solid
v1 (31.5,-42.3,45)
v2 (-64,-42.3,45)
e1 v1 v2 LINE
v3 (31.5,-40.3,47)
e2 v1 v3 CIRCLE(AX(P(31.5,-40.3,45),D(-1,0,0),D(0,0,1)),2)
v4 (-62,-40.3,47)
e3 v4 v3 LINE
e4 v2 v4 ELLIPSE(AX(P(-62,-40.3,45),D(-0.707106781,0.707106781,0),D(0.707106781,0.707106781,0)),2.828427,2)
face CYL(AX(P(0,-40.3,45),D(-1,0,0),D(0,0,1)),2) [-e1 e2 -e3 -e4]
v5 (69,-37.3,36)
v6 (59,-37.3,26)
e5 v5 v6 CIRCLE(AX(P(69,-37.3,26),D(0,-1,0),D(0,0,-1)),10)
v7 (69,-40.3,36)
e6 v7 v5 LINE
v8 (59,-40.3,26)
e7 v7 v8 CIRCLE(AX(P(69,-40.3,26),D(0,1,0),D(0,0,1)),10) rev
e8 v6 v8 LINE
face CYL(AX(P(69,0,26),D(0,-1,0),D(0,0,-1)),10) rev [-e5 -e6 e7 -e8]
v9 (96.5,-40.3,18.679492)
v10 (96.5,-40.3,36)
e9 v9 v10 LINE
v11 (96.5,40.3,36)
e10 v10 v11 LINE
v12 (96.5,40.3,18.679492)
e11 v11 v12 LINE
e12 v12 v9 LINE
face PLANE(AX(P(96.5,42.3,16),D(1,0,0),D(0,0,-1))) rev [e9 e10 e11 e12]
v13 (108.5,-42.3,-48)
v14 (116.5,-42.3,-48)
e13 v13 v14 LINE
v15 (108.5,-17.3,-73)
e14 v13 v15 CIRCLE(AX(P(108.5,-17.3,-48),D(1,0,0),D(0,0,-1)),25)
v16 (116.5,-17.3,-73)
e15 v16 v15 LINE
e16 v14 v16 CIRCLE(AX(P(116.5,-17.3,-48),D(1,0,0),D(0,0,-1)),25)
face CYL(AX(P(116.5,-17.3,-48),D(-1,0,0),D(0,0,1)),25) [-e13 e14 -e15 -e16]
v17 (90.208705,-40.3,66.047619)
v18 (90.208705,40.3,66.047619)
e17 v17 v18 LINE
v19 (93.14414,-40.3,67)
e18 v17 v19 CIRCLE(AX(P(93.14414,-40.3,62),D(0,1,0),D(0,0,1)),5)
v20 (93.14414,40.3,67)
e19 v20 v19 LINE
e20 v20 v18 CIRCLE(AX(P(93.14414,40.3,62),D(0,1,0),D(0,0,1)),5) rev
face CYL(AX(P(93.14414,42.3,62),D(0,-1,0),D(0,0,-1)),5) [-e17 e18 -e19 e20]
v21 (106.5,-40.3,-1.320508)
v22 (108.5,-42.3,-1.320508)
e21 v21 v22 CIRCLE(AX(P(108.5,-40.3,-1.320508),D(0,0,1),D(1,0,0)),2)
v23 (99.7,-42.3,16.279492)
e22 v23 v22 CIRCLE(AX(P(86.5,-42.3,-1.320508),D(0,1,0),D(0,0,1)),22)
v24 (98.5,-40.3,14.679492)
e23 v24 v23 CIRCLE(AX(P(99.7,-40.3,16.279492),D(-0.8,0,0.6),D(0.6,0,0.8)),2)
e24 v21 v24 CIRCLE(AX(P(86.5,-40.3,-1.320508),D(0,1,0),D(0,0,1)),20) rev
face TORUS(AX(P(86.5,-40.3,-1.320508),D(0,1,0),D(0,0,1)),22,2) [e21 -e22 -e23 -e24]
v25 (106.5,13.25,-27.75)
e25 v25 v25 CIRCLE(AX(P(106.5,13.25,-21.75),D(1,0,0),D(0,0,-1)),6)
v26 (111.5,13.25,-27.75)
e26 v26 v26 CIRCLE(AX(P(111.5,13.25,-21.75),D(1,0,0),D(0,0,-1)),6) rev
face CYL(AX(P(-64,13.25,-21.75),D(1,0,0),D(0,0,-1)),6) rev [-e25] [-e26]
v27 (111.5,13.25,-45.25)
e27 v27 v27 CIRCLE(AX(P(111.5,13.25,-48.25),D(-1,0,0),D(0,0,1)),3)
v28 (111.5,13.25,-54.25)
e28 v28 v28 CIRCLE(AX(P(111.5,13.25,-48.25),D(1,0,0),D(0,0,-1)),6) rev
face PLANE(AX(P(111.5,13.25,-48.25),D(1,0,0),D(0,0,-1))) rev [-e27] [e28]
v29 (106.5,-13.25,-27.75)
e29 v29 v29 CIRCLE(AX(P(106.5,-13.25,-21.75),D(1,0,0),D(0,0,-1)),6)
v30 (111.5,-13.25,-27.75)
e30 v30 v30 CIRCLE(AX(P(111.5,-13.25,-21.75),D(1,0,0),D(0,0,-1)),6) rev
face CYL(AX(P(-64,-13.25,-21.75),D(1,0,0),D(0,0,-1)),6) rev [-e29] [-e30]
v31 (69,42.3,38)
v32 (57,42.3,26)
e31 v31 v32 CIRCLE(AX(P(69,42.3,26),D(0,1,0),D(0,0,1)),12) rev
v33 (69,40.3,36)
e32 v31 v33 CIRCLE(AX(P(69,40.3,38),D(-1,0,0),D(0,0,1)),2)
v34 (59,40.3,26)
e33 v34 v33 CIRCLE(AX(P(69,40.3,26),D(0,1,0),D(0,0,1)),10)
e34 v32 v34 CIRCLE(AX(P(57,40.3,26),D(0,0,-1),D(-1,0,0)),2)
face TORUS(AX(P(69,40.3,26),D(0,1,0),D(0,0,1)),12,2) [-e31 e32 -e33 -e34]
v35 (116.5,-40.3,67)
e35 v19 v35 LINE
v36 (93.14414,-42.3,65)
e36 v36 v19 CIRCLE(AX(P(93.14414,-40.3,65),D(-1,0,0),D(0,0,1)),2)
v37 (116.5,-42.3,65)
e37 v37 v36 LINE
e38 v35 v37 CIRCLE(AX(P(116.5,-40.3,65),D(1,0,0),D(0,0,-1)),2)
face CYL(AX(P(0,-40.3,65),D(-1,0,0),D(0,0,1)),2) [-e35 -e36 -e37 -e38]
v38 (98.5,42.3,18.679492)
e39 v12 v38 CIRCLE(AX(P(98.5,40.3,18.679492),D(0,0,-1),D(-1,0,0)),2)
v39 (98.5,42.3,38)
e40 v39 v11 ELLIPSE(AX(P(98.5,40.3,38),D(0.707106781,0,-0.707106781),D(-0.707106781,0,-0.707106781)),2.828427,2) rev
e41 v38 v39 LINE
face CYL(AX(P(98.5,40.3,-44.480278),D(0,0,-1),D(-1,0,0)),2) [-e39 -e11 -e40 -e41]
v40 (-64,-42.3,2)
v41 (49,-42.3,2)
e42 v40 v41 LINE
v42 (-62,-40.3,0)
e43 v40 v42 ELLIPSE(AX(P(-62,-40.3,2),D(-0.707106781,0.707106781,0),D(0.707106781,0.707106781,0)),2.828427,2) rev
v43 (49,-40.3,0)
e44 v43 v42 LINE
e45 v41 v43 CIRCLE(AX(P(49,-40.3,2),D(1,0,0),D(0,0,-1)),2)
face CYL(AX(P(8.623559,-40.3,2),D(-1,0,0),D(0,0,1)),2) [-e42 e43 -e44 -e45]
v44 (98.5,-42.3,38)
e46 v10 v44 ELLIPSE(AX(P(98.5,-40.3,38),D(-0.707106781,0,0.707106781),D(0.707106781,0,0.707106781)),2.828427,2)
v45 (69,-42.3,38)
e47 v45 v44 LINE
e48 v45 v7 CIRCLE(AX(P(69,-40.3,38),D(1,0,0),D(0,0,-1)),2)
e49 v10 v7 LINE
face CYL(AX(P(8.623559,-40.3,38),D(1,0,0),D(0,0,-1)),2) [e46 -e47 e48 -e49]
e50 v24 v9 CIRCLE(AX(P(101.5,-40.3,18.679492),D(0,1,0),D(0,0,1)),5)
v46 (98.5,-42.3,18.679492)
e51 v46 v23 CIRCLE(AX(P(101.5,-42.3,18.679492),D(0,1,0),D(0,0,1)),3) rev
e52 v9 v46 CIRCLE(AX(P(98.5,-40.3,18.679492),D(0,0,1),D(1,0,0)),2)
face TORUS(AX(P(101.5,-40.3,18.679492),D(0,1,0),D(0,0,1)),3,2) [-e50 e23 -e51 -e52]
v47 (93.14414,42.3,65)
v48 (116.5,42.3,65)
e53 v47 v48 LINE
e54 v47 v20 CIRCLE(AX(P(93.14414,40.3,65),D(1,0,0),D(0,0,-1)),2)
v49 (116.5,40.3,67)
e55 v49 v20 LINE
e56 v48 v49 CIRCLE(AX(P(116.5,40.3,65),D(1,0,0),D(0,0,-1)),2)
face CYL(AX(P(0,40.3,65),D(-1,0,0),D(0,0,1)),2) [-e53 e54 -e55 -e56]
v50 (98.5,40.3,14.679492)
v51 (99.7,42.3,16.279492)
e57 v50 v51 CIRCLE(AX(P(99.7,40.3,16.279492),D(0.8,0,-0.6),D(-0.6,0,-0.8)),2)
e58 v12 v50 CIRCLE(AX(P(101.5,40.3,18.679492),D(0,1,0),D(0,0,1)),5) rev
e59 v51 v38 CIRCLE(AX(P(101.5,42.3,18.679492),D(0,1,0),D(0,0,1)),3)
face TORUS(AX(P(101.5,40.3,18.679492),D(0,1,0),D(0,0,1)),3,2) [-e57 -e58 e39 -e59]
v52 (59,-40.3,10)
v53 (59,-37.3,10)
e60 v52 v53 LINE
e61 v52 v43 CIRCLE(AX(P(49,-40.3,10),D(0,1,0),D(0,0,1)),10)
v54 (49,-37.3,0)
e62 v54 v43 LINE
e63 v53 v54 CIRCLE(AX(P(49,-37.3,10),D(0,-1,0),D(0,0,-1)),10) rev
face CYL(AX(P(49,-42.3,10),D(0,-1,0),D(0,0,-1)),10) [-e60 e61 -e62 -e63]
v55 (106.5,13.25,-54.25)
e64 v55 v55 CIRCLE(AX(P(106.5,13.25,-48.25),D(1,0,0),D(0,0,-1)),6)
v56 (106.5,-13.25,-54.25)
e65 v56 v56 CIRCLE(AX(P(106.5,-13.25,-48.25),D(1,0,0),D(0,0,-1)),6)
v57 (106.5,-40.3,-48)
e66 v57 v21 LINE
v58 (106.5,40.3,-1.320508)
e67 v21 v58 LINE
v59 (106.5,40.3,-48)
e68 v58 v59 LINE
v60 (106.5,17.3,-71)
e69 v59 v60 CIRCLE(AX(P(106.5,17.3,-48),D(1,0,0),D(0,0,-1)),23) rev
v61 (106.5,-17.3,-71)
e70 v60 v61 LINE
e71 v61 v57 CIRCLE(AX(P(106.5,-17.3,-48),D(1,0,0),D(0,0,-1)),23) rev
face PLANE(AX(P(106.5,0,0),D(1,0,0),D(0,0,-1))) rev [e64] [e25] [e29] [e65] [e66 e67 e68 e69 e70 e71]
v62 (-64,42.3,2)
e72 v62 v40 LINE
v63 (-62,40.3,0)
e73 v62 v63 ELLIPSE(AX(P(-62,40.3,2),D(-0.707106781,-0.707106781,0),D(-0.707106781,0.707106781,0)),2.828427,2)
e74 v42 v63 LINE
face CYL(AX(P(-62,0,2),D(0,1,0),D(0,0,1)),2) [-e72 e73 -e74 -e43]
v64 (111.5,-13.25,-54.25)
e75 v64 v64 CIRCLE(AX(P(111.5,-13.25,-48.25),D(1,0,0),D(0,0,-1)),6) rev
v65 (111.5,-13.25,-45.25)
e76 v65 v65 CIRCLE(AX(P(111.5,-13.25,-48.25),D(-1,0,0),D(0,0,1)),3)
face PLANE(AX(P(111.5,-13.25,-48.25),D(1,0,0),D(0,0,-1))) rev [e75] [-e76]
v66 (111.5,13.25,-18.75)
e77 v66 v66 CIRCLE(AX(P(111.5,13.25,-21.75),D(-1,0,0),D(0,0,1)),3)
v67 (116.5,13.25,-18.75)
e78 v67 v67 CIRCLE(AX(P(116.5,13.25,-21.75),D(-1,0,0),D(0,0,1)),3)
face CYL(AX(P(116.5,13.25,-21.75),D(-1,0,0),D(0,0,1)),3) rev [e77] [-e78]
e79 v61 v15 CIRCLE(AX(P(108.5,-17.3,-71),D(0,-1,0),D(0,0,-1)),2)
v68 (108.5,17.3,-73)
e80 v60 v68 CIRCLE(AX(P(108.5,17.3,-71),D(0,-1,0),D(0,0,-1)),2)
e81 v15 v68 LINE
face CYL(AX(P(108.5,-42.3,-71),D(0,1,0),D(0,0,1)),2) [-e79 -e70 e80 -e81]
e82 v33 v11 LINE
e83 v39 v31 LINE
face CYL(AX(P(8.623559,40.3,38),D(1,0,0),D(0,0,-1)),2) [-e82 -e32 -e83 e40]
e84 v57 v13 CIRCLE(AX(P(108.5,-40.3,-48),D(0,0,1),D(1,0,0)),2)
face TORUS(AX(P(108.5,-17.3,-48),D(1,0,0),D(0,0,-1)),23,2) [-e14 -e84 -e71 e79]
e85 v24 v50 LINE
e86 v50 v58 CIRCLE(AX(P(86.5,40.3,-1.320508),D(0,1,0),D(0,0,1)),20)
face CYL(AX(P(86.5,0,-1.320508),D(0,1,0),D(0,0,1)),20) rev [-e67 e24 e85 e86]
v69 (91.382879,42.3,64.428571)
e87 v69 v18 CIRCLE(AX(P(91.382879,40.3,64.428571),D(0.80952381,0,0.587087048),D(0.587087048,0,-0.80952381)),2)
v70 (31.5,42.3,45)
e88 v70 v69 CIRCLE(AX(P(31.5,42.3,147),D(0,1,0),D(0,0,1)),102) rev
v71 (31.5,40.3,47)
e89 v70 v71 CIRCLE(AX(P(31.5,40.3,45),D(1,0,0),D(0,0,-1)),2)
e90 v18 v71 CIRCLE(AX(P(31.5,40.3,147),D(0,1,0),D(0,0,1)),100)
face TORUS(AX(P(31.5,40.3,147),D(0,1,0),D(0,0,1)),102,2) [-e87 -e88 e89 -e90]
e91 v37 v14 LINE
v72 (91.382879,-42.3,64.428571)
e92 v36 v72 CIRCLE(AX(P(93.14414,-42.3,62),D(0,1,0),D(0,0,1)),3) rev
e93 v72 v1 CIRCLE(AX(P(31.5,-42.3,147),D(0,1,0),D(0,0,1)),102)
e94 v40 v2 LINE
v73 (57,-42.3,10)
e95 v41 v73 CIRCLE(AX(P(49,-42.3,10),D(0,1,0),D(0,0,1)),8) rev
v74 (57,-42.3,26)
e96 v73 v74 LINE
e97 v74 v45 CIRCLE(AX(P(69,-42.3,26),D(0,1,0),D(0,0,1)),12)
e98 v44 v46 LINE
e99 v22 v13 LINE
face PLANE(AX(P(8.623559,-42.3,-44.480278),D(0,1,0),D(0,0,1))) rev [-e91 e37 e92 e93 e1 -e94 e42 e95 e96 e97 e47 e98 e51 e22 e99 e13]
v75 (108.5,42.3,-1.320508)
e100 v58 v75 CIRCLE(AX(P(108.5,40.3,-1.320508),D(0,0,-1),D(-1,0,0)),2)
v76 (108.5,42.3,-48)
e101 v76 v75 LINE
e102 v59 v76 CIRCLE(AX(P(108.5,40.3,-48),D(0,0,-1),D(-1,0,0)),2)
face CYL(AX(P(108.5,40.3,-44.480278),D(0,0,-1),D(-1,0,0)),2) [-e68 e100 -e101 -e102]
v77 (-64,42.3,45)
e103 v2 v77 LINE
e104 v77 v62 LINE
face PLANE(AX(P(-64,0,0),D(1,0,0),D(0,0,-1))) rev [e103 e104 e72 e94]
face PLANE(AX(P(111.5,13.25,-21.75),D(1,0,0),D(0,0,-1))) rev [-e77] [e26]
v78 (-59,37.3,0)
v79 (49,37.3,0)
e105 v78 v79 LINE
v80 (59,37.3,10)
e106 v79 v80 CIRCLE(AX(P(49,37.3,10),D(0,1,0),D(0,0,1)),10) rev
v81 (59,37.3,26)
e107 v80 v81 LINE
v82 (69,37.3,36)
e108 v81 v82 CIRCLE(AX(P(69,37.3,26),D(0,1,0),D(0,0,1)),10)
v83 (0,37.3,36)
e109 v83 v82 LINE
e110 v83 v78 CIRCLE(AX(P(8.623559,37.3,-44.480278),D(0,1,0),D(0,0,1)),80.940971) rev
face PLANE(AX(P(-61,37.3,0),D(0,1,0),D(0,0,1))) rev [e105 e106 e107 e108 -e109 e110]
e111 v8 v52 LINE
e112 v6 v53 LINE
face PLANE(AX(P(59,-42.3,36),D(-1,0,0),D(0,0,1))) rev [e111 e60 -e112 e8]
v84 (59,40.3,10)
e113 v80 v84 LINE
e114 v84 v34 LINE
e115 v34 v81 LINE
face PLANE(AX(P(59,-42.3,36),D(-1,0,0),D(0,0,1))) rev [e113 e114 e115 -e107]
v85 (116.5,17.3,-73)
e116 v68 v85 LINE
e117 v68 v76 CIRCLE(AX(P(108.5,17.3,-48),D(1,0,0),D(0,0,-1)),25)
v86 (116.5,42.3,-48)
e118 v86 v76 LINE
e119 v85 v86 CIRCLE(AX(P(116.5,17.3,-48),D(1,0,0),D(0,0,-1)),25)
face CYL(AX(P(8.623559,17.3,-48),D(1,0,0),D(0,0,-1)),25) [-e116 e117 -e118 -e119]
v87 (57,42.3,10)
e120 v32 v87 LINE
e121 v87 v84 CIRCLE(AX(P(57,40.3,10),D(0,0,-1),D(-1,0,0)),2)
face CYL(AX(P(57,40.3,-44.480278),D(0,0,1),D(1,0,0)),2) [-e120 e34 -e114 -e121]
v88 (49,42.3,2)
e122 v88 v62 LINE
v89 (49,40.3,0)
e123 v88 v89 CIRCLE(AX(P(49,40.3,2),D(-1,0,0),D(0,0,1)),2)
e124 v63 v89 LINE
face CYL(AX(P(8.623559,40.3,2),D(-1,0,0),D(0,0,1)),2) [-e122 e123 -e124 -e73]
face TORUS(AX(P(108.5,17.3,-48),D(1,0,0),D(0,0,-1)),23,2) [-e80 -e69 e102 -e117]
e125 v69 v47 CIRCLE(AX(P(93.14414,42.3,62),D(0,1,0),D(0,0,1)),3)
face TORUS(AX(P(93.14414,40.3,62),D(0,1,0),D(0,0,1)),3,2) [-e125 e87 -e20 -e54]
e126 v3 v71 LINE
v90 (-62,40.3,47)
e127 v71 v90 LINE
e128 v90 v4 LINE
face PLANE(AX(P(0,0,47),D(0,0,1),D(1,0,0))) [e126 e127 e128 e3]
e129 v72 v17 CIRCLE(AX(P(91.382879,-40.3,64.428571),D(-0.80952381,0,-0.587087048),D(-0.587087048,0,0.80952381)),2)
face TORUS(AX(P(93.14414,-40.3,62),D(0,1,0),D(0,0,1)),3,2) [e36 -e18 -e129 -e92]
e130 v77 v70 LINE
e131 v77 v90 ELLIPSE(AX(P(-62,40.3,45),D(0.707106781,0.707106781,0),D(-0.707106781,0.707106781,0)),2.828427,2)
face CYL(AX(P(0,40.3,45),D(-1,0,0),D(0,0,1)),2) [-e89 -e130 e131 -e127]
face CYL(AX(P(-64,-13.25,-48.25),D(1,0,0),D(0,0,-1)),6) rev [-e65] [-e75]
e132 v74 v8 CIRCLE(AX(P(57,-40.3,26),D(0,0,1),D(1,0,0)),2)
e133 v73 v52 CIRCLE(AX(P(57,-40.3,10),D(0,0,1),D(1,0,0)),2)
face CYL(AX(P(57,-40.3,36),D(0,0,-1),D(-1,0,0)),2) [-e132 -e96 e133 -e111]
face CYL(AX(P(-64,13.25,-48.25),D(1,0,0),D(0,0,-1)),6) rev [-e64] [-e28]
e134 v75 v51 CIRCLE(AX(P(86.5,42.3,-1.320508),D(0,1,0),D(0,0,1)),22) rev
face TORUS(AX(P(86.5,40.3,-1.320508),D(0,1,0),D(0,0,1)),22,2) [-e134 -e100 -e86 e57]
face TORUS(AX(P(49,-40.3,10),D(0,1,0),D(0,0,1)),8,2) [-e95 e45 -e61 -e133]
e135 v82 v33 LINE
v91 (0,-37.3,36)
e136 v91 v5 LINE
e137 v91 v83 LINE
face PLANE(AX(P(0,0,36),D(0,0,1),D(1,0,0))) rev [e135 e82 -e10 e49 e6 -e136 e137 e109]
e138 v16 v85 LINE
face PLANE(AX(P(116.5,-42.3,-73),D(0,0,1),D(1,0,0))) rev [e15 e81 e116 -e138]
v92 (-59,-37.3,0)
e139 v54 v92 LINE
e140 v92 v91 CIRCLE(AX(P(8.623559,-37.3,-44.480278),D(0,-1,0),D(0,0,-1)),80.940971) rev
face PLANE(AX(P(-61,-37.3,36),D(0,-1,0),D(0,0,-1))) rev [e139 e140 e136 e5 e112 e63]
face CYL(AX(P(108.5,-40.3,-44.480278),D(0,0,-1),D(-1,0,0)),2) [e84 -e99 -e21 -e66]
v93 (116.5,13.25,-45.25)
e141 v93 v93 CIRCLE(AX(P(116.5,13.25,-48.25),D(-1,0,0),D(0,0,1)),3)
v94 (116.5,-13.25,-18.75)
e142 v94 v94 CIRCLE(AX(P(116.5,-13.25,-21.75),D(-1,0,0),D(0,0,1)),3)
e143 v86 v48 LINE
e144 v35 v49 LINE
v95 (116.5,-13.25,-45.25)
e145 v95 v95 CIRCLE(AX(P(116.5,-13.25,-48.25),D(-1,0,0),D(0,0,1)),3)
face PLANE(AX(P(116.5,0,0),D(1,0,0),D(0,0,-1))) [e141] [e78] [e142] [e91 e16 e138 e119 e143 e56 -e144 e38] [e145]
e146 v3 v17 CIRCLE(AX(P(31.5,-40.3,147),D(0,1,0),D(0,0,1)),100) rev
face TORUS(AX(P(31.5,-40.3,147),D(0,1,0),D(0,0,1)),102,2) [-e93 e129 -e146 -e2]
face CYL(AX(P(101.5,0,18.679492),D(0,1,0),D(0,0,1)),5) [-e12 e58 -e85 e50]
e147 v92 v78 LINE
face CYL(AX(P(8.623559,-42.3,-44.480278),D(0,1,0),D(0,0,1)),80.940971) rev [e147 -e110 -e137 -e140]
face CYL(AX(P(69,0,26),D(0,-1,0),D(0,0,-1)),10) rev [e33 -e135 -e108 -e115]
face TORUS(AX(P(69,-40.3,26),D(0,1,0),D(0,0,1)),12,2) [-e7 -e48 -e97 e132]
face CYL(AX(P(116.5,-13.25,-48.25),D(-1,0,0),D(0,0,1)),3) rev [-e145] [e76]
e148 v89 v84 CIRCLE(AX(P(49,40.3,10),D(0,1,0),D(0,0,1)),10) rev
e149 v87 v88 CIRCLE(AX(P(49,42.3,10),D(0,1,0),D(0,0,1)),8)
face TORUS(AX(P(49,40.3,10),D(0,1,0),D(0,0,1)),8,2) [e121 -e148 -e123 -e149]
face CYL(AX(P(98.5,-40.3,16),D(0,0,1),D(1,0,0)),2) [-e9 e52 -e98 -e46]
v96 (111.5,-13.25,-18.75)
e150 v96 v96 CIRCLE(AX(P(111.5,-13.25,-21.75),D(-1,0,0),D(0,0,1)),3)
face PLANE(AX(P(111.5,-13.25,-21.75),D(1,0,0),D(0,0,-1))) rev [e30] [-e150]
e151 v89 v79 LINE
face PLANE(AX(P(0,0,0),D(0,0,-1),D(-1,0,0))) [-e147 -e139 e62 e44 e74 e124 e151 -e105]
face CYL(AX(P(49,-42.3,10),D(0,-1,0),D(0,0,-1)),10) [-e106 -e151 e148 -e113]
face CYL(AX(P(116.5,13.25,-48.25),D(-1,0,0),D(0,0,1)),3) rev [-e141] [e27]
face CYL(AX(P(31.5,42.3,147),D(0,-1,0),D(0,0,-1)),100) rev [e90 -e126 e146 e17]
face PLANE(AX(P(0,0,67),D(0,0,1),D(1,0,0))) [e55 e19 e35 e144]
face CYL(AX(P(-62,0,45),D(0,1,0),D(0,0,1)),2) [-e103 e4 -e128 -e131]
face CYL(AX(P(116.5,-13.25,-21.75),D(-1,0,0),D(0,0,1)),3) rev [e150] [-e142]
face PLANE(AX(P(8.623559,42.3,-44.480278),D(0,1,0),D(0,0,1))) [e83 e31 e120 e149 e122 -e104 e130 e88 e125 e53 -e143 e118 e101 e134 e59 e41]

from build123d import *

# Parameters (mm, degrees)
CROQUIS1_W               = 118
CROQUIS1_H               = 84.6
SALIENTE_EXTRUIR1_DEPTH  = 36
CROQUIS2_W               = 36
CROQUIS2_H               = 74.6
CORTAR_EXTRUIR1_DEPTH    = 120
CORTAR_EXTRUIR3_DEPTH    = 110.243581047
SALIENTE_EXTRUIR2_DEPTH  = 84.6
CROQUIS8_W               = 160.5
CROQUIS8_H               = 84.6
SALIENTE_EXTRUIR3_DEPTH  = 5
CROQUIS9_W               = 41
CROQUIS9_H               = 84.6
SALIENTE_EXTRUIR4_DEPTH  = 5
CROQUIS10_W              = 5
CROQUIS10_H              = 84.6
SALIENTE_EXTRUIR5_DEPTH  = 20
REDONDEO2_R              = 10
REDONDEO4_R              = 2
CROQUIS18_W              = 165.5
CROQUIS18_H              = 84.6
SALIENTE_EXTRUIR9_DEPTH  = 6
CROQUIS23_W              = 31
CROQUIS23_H              = 84.6
SALIENTE_EXTRUIR12_DEPTH = 5
CROQUIS19_W              = 120
CROQUIS19_H              = 84.6
SALIENTE_EXTRUIR10_DEPTH = 10
REDONDEO6_R              = 20
REDONDEO9_R              = 5
CROQUIS22_W              = 25
CROQUIS22_H              = 84.6
SALIENTE_EXTRUIR11_DEPTH = 20
REDONDEO7_R              = 100
REDONDEO10_R             = 5
CROQUIS26_R              = 6
CORTAR_EXTRUIR4_DEPTH    = 200.244924653
CROQUIS28_R              = 6
SALIENTE_EXTRUIR14_DEPTH = 5
CROQUIS30_R              = 3
CORTAR_EXTRUIR5_DEPTH    = 195.726834309
REDONDEO11_R             = 25
REDONDEO12_R             = 2
REDONDEO13_R             = 2


with BuildPart() as part:
    # Croquis1 → Saliente-Extruir1 (new body)
    with BuildSketch(Plane.XY):
        Rectangle(CROQUIS1_W, CROQUIS1_H)
    extrude(amount=SALIENTE_EXTRUIR1_DEPTH)

    # Croquis2 → Cortar-Extruir1 (cut)
    with BuildSketch(Plane(origin=(59, 0, 0), x_dir=(0, 0, -1), z_dir=(1, 0, 0))):
        with Locations((-18, 0)):
            Rectangle(CROQUIS2_W, CROQUIS2_H)
    extrude(amount=-CORTAR_EXTRUIR1_DEPTH, mode=Mode.SUBTRACT)


with BuildPart() as cortar_extruir1_piece_1:
    # of the separate pieces the step leaves, piece 1, a body of its own (cortar_extruir1_pieces)
    add(part.part.solids().sort_by_distance((-59, -42.3, 0))[0])


with BuildPart() as cortar_extruir1_piece_2:
    # of the separate pieces the step leaves, piece 2, a body of its own (cortar_extruir1_pieces)
    add(part.part.solids().sort_by_distance((-59, 42.3, 0))[0])


with BuildPart() as cortar_extruir3_tool:
    # Croquis6 → Cortar-Extruir3 (new, through all)
    with BuildSketch(Plane.XZ.offset(42.3)):
        with BuildLine():
            Line((-59, 0), (-59, 36))
            Line((-59, 36), (0, 36))
            ThreePointArc((0, 36), (-33.535731191, 24.614115008), (-59, 0))
        make_face()
    extrude(amount=-CORTAR_EXTRUIR3_DEPTH)


with BuildPart() as cortar_extruir1_piece_1_1:
    add(cortar_extruir1_piece_1.part)

    # Cortar-Extruir3: cut by cortar_extruir3_tool
    add(cortar_extruir3_tool.part, mode=Mode.SUBTRACT)



with BuildPart() as cortar_extruir1_piece_2_1:
    add(cortar_extruir1_piece_2.part)

    # Cortar-Extruir3: cut by cortar_extruir3_tool
    add(cortar_extruir3_tool.part, mode=Mode.SUBTRACT)


with BuildPart() as body_3:
    # Croquis7 → Saliente-Extruir2 (new, through all)
    with BuildSketch(Plane.XZ.offset(-42.3)):
        with BuildLine():
            Line((-59, 0), (-59, 36))
            Line((-59, 36), (0, 36))
            ThreePointArc((0, 36), (-33.535731191, 24.614115008), (-59, 0))
        make_face()
    extrude(amount=SALIENTE_EXTRUIR2_DEPTH)


with BuildPart() as cortar_extruir1_piece_1_2:
    add(cortar_extruir1_piece_1_1.part)

    add(cortar_extruir1_piece_2_1.part)  # Saliente-Extruir3 merges Cortar-Extruir1 piece 2

    add(body_3.part)  # Saliente-Extruir3 merges body 3
    # Croquis8 → Saliente-Extruir3 (add)
    with BuildSketch(Plane.XY.offset(36)):
        with Locations((21.25, 0)):
            Rectangle(CROQUIS8_W, CROQUIS8_H)
    extrude(amount=SALIENTE_EXTRUIR3_DEPTH)

    # Croquis9 → Saliente-Extruir4 (add)
    with BuildSketch(Plane.ZY.offset(59)):
        with Locations((20.5, 0)):
            Rectangle(CROQUIS9_W, CROQUIS9_H)
    extrude(amount=SALIENTE_EXTRUIR4_DEPTH)

    # Croquis10 → Saliente-Extruir5 (add)
    with BuildSketch(Plane(origin=(0, 0, 36), x_dir=(-1, 0, 0), z_dir=(0, 0, -1))):
        with Locations((-99, 0)):
            Rectangle(CROQUIS10_W, CROQUIS10_H)
    extrude(amount=SALIENTE_EXTRUIR5_DEPTH)

    # Redondeo2
    redondeo2_edges = [cortar_extruir1_piece_1_2.edges().sort_by_distance(p)[0] for p in [
        (59, -39.8, 36),
        (59, -39.8, 0),
        (59, 39.8, 36),
        (59, 39.8, 0),
    ]]
    fillet(redondeo2_edges, radius=REDONDEO2_R)

    # Redondeo4
    redondeo4_edges = [cortar_extruir1_piece_1_2.edges().sort_by_distance(p)[0] for p in [
        (-7.5, -42.3, 0),
        (-64, 0, 0),
        (82.75, 42.3, 36),
        (82.75, -42.3, 36),
        (59, -42.3, 18),
        (-7.5, 42.3, 0),
        (56.071067812, -42.3, 2.928932188),
        (59, 42.3, 18),
        (56.071067812, 42.3, 2.928932188),
        (61.928932188, -42.3, 33.071067812),
        (61.928932188, 42.3, 33.071067812),
    ]]
    fillet(redondeo4_edges, radius=REDONDEO4_R)

    # Croquis18 → Saliente-Extruir9 (add)
    with BuildSketch(Plane.XY.offset(41)):
        with Locations((18.75, 0)):
            Rectangle(CROQUIS18_W, CROQUIS18_H)
    extrude(amount=SALIENTE_EXTRUIR9_DEPTH)

    # Croquis23 → Saliente-Extruir12 (add)
    with BuildSketch(Plane(origin=(101.5, 0, 0), x_dir=(0, 0, -1), z_dir=(1, 0, 0))):
        with Locations((-31.5, 0)):
            Rectangle(CROQUIS23_W, CROQUIS23_H)
    extrude(amount=SALIENTE_EXTRUIR12_DEPTH)

    # Croquis19 → Saliente-Extruir10 (add)
    with BuildSketch(Plane(origin=(106.5, 0, 0), x_dir=(0, 0, -1), z_dir=(1, 0, 0))):
        with Locations((13, 0)):
            Rectangle(CROQUIS19_W, CROQUIS19_H)
    extrude(amount=SALIENTE_EXTRUIR10_DEPTH)

    # Redondeo6
    # the kernel refuses this fillet: 20 mm, written as the material it adds along each edge
    with BuildSketch(Plane(origin=(106.5, 42.3, 16), x_dir=(0, 0, -1), z_dir=(0, -1, 0))) as redondeo6_piece_1:
        with BuildLine():
            CenterArc((17.320508076, -20), REDONDEO6_R, 90, 60)
            Line((0, -10), (-0.346410162, -9.8))
            ThreePointArc((-0.346410162, -9.8), (-0.4, -5), (-0.4, 0))
            Line((-0.4, 0), (0, 0.4))
            Line((0, 0.4), (17.320508076, 0.4))
            Line((17.320508076, 0.4), (17.320508076, 0))
        make_face()
    extrude(amount=84.6)

    # Redondeo9
    redondeo9_edges = [cortar_extruir1_piece_1_2.edges().sort_by_distance(p)[0] for p in [
        (96.5, 0, 16),
    ]]
    fillet(redondeo9_edges, radius=REDONDEO9_R)

    # Croquis22 → Saliente-Extruir11 (add)
    with BuildSketch(Plane.XY.offset(47)):
        with Locations((104, 0)):
            Rectangle(CROQUIS22_W, CROQUIS22_H)
    extrude(amount=SALIENTE_EXTRUIR11_DEPTH)

    # Redondeo7
    # the kernel refuses this fillet: 100 mm, written as the material it adds along each edge
    with BuildSketch(Plane(origin=(91.5, 42.3, 47), x_dir=(0, 0, 1), z_dir=(0, -1, 0))) as redondeo7_piece_1:
        with BuildLine():
            CenterArc((100, 60), REDONDEO7_R, 180, 36.869897646)
            Line((0, 60), (-2, 60))
            Line((-2, 60), (-2, 0))
            Line((-2, 0), (0, -2))
            ThreePointArc((0, -2), (10, -2), (18.4, -1.2))
            Line((18.4, -1.2), (20, 0))
        make_face()
    extrude(amount=84.6)

    # Redondeo10
    redondeo10_edges = [cortar_extruir1_piece_1_2.edges().sort_by_distance(p)[0] for p in [
        (91.5, 0, 67),
    ]]
    fillet(redondeo10_edges, radius=REDONDEO10_R)

    # Croquis26 → Cortar-Extruir4 (cut, through all)
    with BuildSketch(Plane(origin=(116.5, 0, 0), x_dir=(0, 0, -1), z_dir=(1, 0, 0))):
        with Locations((21.75, 13.25)):
            Circle(CROQUIS26_R)
        with Locations((48.25, 13.25)):
            Circle(CROQUIS26_R)
        with Locations((48.25, -13.25)):
            Circle(CROQUIS26_R)
        with Locations((21.75, -13.25)):
            Circle(CROQUIS26_R)
    extrude(amount=-CORTAR_EXTRUIR4_DEPTH, mode=Mode.SUBTRACT)

    # Croquis28 → Saliente-Extruir14 (add)
    with BuildSketch(Plane(origin=(116.5, 0, 0), x_dir=(0, 0, -1), z_dir=(1, 0, 0))):
        with Locations((21.75, 13.25)):
            Circle(CROQUIS28_R)
        with Locations((48.25, 13.25)):
            Circle(CROQUIS28_R)
        with Locations((21.75, -13.25)):
            Circle(CROQUIS28_R)
        with Locations((48.25, -13.25)):
            Circle(CROQUIS28_R)
    extrude(amount=-SALIENTE_EXTRUIR14_DEPTH)

    # Croquis30 → Cortar-Extruir5 (cut, through all)
    with BuildSketch(Plane.ZY.offset(-111.5)):
        with Locations((-48.25, 13.25)):
            Circle(CROQUIS30_R)
        with Locations((-21.75, 13.25)):
            Circle(CROQUIS30_R)
        with Locations((-48.25, -13.25)):
            Circle(CROQUIS30_R)
        with Locations((-21.75, -13.25)):
            Circle(CROQUIS30_R)
    extrude(amount=-CORTAR_EXTRUIR5_DEPTH, mode=Mode.SUBTRACT)

    # Redondeo11
    redondeo11_edges = [cortar_extruir1_piece_1_2.edges().sort_by_distance(p)[0] for p in [
        (111.5, -42.3, -73),
        (111.5, 42.3, -73),
    ]]
    fillet(redondeo11_edges, radius=REDONDEO11_R)

    # Redondeo12
    redondeo12_edges = [cortar_extruir1_piece_1_2.edges().sort_by_distance(p)[0] for p in [
        (106.5, -42.3, -24.660254038),
        (104.38854382, 42.3, 7.623763834),
        (104.38854382, -42.3, 7.623763834),
        (96.5, 42.3, 28.339745962),
        (97.027864045, 42.3, 16.443423947),
        (96.5, -42.3, 28.339745962),
        (97.027864045, -42.3, 16.443423947),
        (106.5, 0, -73),
        (106.5, 42.3, -24.660254038),
        (106.5, 34.97766953, -65.67766953),
        (106.5, -34.97766953, -65.67766953),
    ]]
    fillet(redondeo12_edges, radius=REDONDEO12_R)

    # Redondeo13
    redondeo13_edges = [cortar_extruir1_piece_1_2.edges().sort_by_distance(p)[0] for p in [
        (-64, 0, 47),
        (-16.25, -42.3, 47),
        (104.822070015, 42.3, 67),
        (-16.25, 42.3, 47),
        (62.360669992, 42.3, 51.881026879),
        (104.822070015, -42.3, 67),
        (62.360669992, -42.3, 51.881026879),
        (91.60110653, -42.3, 66.755948656),
        (91.60110653, 42.3, 66.755948656),
    ]]
    fillet(redondeo13_edges, radius=REDONDEO13_R)


solid = cortar_extruir1_piece_1_2.part
